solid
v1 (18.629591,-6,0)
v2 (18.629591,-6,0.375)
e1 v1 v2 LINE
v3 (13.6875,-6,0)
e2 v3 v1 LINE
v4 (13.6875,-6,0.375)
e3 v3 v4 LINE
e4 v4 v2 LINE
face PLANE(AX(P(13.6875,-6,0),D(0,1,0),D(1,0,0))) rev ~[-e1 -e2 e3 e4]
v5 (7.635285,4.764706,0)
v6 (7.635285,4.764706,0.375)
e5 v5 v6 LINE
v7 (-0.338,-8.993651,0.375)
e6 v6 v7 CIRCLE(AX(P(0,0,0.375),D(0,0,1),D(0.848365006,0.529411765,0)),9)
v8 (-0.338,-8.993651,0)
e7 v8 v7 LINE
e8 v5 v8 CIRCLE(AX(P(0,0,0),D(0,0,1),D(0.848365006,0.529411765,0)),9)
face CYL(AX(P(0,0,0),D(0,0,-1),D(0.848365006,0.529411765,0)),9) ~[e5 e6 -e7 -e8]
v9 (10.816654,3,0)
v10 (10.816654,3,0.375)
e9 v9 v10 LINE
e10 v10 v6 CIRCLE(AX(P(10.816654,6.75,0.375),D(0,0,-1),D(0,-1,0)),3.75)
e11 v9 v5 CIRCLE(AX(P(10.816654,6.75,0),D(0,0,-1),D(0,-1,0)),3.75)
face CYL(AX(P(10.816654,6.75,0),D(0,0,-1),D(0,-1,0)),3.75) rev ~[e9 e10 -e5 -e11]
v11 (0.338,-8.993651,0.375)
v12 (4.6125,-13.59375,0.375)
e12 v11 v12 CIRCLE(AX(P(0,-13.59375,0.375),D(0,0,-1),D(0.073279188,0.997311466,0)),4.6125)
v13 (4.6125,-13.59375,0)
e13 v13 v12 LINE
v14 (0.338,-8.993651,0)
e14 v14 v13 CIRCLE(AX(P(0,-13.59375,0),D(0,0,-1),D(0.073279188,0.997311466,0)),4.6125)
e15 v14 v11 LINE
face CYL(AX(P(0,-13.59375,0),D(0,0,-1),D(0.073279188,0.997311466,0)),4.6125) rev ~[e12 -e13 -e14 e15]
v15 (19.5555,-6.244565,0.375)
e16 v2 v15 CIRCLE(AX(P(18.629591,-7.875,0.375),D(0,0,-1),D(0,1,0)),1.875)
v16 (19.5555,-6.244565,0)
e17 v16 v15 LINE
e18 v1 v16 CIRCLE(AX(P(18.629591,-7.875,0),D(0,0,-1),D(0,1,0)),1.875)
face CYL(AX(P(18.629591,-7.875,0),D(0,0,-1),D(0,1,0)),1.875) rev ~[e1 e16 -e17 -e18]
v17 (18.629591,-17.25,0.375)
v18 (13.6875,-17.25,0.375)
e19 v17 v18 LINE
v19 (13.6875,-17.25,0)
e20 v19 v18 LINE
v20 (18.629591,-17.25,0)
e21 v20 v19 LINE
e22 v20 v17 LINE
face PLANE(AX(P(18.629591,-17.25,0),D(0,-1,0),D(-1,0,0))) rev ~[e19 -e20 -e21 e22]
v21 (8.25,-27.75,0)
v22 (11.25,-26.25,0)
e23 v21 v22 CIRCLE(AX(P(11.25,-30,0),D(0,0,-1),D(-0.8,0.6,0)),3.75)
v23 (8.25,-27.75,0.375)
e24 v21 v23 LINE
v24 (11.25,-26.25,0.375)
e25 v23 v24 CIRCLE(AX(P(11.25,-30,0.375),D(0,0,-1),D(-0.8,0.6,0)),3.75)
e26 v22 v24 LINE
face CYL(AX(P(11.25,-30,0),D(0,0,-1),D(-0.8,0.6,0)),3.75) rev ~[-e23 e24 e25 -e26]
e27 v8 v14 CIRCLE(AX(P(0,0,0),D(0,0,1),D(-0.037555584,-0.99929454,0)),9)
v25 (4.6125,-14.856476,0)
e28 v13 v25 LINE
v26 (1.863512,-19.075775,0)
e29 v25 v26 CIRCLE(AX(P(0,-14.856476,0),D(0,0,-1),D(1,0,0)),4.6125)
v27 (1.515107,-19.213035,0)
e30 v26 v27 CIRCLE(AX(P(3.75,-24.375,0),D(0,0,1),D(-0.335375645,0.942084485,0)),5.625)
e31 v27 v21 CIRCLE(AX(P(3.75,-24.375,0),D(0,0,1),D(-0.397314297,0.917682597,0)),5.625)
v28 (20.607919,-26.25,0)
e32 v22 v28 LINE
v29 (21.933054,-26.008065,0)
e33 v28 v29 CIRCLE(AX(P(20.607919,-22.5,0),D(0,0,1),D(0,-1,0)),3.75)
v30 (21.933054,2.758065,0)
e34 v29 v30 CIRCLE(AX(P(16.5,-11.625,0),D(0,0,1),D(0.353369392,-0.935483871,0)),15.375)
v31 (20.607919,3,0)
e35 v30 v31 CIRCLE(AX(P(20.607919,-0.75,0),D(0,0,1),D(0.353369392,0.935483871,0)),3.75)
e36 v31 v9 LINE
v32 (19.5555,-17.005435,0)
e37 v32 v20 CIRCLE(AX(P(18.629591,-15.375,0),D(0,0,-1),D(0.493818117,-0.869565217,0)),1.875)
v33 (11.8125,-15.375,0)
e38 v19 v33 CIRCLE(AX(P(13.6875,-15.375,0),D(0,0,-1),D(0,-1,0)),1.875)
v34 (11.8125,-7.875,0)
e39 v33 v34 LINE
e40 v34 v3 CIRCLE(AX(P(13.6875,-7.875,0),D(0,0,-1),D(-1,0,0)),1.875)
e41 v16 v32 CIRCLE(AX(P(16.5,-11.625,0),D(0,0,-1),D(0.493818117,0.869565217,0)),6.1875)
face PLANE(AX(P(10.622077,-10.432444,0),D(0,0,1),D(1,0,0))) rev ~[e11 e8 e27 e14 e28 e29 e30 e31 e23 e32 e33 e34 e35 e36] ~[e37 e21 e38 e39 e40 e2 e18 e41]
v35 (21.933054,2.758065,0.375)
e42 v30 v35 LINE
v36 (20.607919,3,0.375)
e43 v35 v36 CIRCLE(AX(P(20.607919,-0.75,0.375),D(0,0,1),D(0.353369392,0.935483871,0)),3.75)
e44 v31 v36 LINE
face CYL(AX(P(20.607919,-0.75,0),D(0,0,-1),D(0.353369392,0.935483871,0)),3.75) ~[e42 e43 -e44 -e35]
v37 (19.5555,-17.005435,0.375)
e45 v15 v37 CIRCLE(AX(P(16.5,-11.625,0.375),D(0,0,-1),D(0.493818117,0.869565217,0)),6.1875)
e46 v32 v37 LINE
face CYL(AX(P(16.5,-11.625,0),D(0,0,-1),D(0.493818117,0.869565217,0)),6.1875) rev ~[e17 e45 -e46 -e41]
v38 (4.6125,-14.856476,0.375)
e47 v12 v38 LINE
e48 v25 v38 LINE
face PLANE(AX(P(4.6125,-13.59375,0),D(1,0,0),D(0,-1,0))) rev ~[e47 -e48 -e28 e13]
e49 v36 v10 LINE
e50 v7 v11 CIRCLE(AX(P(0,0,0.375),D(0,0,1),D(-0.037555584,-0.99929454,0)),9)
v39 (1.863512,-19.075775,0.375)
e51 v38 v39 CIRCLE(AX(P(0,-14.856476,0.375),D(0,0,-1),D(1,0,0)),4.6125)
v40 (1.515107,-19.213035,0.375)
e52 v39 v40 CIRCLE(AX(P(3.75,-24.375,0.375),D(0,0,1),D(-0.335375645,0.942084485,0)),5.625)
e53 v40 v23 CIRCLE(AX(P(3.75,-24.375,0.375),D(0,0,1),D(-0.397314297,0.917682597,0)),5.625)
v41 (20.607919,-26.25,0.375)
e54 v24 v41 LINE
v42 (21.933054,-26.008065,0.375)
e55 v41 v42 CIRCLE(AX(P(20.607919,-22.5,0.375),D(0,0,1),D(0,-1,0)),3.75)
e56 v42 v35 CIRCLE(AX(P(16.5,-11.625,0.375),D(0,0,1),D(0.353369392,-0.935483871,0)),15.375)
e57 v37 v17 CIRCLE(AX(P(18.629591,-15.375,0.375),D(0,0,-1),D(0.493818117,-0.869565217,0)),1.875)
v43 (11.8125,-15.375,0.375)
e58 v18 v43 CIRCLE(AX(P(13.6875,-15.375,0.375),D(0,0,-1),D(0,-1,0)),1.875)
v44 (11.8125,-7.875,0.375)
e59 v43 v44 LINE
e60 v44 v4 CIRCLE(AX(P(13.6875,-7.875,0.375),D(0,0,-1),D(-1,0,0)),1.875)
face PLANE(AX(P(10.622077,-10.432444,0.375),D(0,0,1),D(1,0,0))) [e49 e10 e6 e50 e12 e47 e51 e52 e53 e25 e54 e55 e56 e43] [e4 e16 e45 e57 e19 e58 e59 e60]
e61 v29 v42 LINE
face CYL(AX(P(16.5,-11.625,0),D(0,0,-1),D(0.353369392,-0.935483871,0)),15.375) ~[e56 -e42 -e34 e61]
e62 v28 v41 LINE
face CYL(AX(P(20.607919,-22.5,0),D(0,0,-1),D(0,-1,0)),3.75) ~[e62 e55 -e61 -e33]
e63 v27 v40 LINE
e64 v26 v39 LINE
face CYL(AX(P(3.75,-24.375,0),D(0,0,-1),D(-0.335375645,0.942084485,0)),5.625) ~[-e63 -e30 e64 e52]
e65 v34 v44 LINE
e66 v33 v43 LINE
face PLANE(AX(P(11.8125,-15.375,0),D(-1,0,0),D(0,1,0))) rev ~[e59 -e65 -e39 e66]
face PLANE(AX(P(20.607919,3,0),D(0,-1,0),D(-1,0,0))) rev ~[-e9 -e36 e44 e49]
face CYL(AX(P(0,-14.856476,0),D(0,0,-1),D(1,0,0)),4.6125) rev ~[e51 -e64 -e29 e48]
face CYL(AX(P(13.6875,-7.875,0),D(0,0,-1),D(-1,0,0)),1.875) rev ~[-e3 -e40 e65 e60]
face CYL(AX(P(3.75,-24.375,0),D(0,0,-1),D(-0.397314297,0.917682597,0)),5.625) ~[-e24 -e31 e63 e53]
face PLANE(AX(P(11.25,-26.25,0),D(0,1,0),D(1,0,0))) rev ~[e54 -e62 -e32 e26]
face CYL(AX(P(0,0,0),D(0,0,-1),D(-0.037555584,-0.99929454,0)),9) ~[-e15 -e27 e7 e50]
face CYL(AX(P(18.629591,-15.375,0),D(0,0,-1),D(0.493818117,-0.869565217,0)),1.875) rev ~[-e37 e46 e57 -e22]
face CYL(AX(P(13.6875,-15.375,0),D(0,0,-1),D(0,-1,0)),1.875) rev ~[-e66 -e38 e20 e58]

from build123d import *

# Parameters (mm, degrees)
F1_DEPTH = 1
F2_SCALE = 0.5
F3_SCALE = 0.75


# Not quite as in the source:
# - a feature of the source that left no trace in its solid (it failed there, or was rolled back) is left out


with BuildPart() as f1:
    # F0 (on Top) → F1 (new body)
    with BuildSketch(Plane.XY):
        with BuildLine():
            ThreePointArc((28.844410196, 8.0000000124), (23.9936976971, 9.2552536894), (20.3607601383, 12.7058823617))
            ThreePointArc((20.3607601383, 12.7058823617), (-20.765045237, 12.0338230128), (-0.9013340087, -23.9830689655))
            ThreePointArc((-0.9013340087, -23.9830689655), (0, -23.95), (0.9013340087, -23.9830689655))
            ThreePointArc((0.9013340087, -23.9830689655), (9.0104497198, -27.8773184793), (12.3, -36.25))
            Line((12.3, -36.25), (12.3, -39.6172702312))
            ThreePointArc((12.3, -39.6172702312), (10.3056584811, -46.3316877988), (4.9693653218, -50.8687327272))
            ThreePointArc((4.9693653218, -50.8687327272), (4.5085414865, -51.0611792515), (4.0402855379, -51.2347610435))
            ThreePointArc((4.0402855379, -51.2347610435), (-1.7764718202, -74.2905711056), (22, -74))
            ThreePointArc((22, -74), (25.527864045, -71.05572809), (30, -70))
            Line((30, -70), (54.9544511501, -70))
            ThreePointArc((54.9544511501, -70), (56.7505041703, -69.8373875368), (58.4881450694, -69.3548387097))
            ThreePointArc((58.4881450694, -69.3548387097), (85.0000000049, -30.9999999956), (58.488145074, 7.3548387217))
            ThreePointArc((58.488145074, 7.3548387217), (56.7505041744, 7.837387549), (54.9544511536, 8.0000000124))
            Line((54.9544511536, 8.0000000124), (28.844410196, 8.0000000124))
        make_face()
        with BuildLine():
            ThreePointArc((52.1479989309, -16.652173913), (60.5, -31), (52.1479989309, -45.347826087))
            ThreePointArc((52.1479989309, -45.347826087), (50.9557931419, -45.8342078169), (49.6789083458, -46))
            Line((49.6789083458, -46), (36.5, -46))
            ThreePointArc((36.5, -46), (32.9644660941, -44.5355339059), (31.5, -41))
            Line((31.5, -41), (31.5, -21))
            ThreePointArc((31.5, -21), (32.9644660941, -17.4644660941), (36.5, -16))
            Line((36.5, -16), (49.6789083458, -16))
            ThreePointArc((49.6789083458, -16), (50.9557931419, -16.1657921831), (52.1479989309, -16.652173913))
        make_face(mode=Mode.SUBTRACT)
        with BuildLine():
            ThreePointArc((0.9013340087, -23.9830689655), (0, -23.95), (-0.9013340087, -23.9830689655))
            ThreePointArc((-0.9013340087, -23.9830689655), (0, -24), (0.9013340087, -23.9830689655))
        make_face()
        with BuildLine():
            ThreePointArc((4.0402855379, -51.2347610435), (4.5085414865, -51.0611792515), (4.9693653218, -50.8687327272))
            ThreePointArc((4.9693653218, -50.8687327272), (4.501778675, -51.0440133899), (4.0402855379, -51.2347610435))
        make_face()
    extrude(amount=F1_DEPTH)


with BuildPart() as f1_1:
    # F2: moved
    add(f1.part.scale(F2_SCALE))


with BuildPart() as f1_2:
    # F3: moved
    add(f1_1.part.scale(F3_SCALE))


solid = f1_2.part
